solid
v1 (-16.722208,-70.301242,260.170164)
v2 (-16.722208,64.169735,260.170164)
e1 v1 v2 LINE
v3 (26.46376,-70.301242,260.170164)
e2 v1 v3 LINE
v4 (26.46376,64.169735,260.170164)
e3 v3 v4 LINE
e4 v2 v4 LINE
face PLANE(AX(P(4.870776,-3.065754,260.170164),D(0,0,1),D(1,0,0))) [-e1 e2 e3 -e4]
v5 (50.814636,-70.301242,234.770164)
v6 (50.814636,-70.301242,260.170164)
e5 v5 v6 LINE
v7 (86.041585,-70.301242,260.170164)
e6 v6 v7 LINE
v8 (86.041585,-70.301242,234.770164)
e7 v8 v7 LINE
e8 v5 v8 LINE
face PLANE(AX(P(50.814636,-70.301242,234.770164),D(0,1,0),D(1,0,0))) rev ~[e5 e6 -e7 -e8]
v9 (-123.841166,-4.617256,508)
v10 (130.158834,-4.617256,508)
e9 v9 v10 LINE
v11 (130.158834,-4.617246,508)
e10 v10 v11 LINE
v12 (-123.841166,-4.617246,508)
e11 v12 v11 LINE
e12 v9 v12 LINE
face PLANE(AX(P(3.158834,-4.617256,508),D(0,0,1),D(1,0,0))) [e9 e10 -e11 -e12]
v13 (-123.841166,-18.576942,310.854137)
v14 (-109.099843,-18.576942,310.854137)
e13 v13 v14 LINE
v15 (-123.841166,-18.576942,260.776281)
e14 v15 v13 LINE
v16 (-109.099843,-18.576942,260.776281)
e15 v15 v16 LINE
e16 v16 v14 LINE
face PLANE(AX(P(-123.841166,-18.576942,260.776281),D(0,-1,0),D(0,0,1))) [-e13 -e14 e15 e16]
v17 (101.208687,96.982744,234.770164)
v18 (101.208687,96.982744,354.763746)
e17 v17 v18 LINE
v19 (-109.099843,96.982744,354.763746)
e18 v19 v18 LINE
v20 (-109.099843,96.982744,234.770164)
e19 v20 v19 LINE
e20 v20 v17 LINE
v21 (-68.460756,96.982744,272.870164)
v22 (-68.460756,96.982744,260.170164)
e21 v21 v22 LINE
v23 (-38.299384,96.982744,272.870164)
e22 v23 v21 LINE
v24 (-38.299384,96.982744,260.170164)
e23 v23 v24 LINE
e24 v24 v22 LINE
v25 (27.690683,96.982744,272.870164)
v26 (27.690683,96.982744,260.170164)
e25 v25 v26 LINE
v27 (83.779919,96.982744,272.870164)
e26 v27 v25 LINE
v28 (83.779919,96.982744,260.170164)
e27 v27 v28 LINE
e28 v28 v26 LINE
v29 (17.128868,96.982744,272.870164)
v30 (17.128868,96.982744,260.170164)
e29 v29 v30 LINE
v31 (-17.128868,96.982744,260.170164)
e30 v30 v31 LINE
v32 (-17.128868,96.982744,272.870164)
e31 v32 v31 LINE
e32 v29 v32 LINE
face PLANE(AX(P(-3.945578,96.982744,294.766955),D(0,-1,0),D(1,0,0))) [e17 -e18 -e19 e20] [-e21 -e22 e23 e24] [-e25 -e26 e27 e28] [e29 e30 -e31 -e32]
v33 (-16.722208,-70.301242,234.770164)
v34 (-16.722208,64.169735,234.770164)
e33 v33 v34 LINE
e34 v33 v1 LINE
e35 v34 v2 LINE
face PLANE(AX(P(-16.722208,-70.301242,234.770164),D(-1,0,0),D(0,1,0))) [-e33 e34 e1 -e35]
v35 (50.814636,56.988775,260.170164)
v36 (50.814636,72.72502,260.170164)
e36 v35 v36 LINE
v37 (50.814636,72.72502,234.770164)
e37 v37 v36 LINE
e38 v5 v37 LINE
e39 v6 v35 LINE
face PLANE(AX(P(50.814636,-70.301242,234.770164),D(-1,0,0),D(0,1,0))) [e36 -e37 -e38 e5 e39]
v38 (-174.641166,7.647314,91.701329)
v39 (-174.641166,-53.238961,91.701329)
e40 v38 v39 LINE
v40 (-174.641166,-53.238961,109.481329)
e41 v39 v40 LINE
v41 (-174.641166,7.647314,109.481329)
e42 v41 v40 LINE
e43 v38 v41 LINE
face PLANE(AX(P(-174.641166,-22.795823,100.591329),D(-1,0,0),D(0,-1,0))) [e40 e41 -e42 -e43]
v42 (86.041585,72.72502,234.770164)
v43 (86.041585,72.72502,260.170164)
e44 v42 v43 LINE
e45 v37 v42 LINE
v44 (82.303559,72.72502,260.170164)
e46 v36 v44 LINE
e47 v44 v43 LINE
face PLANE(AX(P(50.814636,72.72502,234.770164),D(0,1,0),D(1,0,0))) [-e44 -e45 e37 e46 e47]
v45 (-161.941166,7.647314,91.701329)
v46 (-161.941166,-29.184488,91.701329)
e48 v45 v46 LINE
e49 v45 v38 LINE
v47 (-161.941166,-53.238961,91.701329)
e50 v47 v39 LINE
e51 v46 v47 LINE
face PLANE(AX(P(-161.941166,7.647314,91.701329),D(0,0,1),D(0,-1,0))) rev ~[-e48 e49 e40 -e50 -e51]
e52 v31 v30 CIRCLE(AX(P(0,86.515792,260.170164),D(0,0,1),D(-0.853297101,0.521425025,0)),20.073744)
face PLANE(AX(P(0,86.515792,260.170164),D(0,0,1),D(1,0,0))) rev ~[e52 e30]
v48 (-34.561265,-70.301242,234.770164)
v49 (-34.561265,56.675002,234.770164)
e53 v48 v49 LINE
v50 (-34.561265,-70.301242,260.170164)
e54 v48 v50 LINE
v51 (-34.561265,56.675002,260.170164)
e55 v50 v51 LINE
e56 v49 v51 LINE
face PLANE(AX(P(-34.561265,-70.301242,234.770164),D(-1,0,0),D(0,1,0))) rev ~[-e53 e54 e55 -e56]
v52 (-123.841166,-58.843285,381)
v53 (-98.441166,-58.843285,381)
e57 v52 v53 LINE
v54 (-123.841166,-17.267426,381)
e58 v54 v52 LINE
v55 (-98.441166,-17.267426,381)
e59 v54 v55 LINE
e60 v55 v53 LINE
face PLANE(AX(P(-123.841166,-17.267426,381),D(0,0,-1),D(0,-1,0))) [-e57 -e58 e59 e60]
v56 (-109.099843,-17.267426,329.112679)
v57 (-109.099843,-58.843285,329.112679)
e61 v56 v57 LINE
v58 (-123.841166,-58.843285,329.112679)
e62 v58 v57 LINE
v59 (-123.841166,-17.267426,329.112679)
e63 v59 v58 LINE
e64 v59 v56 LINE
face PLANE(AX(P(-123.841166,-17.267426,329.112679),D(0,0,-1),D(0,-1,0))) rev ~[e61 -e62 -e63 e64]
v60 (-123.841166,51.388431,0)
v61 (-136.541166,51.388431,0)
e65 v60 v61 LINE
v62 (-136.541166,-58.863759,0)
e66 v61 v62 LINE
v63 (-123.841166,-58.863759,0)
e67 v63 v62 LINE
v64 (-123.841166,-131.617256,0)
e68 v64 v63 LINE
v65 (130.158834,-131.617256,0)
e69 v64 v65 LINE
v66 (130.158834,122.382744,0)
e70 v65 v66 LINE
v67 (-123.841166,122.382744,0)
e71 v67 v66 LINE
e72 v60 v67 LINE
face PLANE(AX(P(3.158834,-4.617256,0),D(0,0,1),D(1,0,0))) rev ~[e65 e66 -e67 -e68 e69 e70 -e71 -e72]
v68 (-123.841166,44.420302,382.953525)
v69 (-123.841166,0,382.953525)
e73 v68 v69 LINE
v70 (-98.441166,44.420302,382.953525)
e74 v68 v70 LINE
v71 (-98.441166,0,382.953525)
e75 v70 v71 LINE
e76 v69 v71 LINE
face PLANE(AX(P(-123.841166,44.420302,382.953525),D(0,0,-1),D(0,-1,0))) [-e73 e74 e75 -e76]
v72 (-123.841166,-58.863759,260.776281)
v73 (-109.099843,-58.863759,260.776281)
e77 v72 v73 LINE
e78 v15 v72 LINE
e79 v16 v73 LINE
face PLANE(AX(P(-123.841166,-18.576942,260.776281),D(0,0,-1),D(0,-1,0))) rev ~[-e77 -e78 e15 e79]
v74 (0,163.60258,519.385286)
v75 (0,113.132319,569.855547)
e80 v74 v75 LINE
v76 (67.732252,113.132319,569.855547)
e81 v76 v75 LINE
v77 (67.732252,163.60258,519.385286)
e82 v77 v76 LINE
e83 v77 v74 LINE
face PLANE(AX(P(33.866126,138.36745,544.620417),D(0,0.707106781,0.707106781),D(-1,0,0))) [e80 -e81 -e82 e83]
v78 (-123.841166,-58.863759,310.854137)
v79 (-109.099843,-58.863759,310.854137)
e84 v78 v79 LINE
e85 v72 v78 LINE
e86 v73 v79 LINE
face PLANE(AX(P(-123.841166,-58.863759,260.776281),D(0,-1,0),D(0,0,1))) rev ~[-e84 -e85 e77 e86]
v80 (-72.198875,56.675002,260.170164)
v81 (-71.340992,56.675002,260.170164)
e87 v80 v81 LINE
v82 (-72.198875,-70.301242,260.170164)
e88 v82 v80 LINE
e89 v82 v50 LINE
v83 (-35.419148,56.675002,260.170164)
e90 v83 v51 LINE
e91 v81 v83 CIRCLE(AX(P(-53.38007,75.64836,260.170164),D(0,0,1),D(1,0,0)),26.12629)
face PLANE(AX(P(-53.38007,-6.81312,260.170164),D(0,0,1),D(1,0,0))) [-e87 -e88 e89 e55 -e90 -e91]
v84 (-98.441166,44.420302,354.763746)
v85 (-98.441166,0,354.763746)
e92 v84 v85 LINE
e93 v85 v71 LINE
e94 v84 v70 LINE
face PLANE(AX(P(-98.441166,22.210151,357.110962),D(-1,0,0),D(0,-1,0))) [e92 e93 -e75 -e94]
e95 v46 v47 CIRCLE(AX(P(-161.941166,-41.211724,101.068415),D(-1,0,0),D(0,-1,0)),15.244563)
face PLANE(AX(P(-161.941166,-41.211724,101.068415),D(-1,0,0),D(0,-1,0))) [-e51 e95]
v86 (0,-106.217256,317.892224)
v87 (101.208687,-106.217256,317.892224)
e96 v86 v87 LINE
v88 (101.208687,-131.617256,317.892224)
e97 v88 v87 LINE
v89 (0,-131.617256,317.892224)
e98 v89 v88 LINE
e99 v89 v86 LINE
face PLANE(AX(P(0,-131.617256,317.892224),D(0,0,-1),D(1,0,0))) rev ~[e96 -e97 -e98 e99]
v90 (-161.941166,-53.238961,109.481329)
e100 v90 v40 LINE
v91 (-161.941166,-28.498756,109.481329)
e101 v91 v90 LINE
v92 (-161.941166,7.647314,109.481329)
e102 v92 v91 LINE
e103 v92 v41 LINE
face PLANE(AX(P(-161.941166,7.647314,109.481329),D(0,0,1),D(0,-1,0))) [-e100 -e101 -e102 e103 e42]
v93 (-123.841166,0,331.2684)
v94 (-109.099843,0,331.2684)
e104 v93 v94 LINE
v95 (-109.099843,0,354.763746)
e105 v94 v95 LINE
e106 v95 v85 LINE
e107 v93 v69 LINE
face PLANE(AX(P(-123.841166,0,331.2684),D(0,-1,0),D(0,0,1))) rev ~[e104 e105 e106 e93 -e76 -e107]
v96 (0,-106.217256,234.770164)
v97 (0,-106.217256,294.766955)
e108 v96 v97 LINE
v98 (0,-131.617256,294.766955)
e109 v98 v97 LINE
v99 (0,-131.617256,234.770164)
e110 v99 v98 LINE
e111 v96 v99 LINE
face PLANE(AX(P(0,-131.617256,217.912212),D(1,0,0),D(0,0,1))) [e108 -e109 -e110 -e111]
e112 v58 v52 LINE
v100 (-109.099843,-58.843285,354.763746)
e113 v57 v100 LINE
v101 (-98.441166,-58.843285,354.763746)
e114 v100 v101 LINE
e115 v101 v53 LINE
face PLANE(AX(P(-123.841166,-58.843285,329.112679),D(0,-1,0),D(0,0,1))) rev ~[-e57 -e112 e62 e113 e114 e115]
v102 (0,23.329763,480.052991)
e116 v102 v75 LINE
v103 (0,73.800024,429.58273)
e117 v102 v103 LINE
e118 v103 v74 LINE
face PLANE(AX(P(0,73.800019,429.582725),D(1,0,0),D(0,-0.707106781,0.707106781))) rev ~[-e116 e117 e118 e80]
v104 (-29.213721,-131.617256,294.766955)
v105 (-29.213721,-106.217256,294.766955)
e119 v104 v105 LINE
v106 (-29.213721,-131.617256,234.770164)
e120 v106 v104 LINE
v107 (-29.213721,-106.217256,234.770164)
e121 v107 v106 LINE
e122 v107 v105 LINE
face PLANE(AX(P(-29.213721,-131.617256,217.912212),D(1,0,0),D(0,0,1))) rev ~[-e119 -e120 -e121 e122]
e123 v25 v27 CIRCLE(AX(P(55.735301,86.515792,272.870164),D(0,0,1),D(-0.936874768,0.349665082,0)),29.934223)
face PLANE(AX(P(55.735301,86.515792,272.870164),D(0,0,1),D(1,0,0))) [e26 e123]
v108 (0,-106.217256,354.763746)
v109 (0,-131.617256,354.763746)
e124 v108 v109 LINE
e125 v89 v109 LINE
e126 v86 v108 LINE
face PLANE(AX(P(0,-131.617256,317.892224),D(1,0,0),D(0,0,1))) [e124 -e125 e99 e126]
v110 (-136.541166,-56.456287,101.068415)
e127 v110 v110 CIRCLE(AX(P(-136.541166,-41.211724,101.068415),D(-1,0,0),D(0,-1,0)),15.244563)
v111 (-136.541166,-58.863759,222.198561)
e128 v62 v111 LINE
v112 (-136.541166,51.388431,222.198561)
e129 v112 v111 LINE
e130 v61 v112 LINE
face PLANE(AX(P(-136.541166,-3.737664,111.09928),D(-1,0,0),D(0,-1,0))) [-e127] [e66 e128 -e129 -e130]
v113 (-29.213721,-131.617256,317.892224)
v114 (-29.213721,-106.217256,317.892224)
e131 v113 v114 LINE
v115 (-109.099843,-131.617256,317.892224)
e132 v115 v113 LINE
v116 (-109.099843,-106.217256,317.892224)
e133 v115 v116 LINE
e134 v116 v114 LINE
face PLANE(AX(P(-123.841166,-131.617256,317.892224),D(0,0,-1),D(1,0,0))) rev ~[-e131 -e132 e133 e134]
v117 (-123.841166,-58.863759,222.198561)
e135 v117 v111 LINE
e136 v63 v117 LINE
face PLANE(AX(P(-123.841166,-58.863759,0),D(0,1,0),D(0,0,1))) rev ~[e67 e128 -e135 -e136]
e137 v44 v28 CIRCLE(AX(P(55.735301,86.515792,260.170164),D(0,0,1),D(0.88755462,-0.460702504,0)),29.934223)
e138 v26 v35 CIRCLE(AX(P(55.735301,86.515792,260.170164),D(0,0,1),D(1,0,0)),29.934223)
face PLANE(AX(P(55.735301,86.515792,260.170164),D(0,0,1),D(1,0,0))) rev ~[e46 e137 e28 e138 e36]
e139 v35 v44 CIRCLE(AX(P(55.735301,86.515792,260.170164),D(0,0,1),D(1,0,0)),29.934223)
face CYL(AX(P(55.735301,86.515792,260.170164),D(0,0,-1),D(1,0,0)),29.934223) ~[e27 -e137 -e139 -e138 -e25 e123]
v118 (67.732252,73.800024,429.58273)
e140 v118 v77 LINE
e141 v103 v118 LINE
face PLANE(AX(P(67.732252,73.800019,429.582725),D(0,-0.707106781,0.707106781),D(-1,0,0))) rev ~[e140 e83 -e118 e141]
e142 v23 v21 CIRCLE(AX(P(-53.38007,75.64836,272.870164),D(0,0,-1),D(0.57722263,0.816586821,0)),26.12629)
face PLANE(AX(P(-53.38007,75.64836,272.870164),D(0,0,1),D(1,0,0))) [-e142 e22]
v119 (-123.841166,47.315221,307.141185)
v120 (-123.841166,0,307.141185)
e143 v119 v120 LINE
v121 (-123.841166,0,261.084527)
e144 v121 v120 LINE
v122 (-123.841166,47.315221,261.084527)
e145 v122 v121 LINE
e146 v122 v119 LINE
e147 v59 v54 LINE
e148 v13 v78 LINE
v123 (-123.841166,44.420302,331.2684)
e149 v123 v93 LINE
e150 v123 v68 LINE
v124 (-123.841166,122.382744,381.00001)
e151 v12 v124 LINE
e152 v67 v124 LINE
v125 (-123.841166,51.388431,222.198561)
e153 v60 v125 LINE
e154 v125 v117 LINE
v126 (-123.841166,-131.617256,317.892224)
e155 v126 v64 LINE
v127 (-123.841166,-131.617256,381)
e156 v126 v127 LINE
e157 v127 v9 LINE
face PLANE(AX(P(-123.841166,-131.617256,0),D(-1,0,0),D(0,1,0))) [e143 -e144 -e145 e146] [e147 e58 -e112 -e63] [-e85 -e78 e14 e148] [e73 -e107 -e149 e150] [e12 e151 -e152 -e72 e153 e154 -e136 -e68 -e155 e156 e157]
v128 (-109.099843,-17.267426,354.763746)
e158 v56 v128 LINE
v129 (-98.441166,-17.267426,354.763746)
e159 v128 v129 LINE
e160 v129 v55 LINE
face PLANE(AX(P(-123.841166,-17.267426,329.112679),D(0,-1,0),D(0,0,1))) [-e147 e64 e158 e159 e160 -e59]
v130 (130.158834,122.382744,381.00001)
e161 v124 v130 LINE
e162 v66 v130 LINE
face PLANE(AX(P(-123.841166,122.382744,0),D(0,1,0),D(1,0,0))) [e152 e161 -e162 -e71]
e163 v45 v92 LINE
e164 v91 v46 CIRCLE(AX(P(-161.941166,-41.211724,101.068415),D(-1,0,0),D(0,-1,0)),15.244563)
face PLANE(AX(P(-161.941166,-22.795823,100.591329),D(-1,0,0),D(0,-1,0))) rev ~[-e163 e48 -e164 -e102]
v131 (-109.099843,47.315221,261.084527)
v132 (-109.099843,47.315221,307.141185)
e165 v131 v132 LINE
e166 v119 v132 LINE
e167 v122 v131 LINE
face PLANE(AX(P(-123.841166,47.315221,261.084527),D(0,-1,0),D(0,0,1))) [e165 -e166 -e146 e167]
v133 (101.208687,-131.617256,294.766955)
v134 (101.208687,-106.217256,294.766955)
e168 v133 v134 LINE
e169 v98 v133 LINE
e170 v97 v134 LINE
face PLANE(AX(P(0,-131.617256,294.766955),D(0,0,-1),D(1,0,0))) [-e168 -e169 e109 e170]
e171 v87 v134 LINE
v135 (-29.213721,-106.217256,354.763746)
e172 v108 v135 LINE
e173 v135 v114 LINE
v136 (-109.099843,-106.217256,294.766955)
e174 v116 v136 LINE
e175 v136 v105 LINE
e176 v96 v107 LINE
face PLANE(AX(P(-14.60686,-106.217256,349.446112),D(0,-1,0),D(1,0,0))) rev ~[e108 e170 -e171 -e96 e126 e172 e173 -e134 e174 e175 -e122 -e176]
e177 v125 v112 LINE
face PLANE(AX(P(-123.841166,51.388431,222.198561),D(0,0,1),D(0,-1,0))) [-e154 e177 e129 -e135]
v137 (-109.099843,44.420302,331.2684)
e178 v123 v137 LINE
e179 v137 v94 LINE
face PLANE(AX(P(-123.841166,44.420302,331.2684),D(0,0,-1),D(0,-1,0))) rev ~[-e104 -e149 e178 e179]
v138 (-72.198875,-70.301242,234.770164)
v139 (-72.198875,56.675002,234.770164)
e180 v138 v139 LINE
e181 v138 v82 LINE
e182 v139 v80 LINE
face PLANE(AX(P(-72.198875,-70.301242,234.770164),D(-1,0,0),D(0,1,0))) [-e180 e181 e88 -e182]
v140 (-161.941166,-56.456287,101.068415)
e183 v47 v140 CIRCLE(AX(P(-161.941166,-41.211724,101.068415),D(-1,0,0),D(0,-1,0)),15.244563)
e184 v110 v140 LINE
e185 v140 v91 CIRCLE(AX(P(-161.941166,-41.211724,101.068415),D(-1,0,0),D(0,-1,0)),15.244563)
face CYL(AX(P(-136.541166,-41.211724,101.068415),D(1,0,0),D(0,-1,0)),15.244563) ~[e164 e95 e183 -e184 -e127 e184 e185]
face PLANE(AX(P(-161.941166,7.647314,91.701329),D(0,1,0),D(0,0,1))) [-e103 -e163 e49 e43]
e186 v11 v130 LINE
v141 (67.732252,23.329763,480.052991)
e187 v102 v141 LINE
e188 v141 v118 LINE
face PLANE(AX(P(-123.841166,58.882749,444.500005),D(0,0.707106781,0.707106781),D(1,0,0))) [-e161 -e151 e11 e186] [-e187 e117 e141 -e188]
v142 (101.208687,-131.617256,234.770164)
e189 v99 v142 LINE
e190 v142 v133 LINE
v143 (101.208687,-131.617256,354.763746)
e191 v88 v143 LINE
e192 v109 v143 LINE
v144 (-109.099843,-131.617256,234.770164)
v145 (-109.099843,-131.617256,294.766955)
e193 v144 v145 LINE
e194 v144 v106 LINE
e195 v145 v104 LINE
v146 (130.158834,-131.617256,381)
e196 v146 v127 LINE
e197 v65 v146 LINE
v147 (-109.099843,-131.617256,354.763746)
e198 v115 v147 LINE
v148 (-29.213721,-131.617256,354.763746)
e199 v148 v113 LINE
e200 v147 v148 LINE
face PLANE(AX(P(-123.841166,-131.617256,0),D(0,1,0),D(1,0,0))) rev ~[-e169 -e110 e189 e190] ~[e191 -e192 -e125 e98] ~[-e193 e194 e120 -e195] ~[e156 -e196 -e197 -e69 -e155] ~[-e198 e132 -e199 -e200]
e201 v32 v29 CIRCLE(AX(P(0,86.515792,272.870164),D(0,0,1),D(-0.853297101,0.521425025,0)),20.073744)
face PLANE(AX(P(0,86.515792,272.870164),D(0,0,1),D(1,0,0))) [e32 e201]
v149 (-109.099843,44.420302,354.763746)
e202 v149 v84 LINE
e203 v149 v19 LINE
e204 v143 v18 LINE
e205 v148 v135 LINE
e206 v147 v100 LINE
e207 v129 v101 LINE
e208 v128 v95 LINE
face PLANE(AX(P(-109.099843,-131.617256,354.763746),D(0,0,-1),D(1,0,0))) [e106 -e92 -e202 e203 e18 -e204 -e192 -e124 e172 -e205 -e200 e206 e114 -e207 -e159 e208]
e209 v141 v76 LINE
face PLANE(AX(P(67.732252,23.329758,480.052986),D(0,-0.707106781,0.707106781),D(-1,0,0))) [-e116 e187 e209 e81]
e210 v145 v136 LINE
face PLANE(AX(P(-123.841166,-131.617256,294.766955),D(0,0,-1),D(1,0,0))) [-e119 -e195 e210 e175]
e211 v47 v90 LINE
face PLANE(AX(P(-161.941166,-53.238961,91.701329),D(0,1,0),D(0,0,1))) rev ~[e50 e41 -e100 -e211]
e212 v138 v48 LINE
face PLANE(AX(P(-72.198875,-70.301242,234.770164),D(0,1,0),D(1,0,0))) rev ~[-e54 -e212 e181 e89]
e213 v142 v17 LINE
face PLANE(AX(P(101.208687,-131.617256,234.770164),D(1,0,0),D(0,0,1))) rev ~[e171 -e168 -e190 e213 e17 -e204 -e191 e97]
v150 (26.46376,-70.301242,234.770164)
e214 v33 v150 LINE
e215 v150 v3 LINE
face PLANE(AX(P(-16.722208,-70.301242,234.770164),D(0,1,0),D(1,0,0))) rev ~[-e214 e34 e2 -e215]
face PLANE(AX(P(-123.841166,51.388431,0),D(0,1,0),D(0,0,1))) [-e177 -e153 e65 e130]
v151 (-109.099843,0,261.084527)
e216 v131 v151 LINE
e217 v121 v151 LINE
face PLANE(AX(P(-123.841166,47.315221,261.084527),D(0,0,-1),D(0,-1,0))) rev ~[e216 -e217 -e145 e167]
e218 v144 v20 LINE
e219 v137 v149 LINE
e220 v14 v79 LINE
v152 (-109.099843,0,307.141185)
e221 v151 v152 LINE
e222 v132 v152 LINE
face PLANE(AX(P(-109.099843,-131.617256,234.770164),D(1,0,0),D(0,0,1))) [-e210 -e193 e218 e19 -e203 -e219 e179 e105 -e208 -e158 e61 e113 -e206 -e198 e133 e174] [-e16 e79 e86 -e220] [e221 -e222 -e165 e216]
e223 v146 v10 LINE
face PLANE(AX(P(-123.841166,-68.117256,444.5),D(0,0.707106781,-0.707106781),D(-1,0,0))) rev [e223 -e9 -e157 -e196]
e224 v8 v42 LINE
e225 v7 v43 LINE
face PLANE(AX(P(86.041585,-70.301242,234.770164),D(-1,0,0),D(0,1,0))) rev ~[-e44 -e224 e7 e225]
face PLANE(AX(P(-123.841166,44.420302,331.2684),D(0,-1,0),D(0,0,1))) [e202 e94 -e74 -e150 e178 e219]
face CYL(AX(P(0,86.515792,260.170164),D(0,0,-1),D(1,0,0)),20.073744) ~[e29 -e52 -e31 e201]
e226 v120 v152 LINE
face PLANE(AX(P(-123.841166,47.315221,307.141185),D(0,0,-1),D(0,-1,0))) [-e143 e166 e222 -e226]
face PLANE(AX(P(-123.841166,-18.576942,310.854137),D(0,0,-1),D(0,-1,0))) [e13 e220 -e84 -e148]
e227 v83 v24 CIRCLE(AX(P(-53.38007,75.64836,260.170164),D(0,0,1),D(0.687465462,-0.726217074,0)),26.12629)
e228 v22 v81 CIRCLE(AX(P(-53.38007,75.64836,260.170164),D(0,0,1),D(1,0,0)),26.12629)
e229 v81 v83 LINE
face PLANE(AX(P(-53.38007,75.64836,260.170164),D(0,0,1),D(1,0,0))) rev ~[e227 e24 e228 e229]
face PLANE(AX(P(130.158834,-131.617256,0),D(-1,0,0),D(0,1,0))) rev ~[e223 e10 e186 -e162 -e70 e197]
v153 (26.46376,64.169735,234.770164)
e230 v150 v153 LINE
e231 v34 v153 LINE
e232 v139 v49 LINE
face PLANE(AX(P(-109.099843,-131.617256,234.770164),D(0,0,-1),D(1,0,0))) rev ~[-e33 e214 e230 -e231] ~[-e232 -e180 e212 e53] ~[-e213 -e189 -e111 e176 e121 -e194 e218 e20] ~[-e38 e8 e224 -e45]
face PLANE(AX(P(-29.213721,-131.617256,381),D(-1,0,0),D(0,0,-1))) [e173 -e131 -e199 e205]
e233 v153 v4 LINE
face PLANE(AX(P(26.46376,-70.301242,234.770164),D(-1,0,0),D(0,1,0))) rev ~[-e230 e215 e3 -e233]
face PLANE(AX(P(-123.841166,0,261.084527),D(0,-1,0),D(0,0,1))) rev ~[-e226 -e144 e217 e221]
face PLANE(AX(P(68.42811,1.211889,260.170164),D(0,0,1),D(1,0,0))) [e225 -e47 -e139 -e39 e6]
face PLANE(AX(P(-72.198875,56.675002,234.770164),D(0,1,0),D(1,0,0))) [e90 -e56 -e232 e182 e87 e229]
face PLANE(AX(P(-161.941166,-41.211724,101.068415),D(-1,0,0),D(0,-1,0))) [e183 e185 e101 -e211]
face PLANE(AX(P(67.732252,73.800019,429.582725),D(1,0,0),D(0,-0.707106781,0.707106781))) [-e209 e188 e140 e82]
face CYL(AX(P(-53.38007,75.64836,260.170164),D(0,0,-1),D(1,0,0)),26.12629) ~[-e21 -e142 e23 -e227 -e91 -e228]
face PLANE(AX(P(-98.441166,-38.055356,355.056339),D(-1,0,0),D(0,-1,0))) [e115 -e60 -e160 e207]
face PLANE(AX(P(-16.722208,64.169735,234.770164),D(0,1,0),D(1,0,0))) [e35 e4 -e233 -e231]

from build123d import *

# Parameters (mm, degrees)
F0_W      = 254
F0_H      = 254
F1_DEPTH  = 508
F2_SIZE   = 127
F3_SIZE   = 126.99999
F4_W      = 110.2521903813
F4_H      = 222.1985608339
F5_DEPTH  = 12.7
F6_R      = 15.2445630658
F7_DEPTH  = 25.4
F8_W      = 60.8862751365
F8_H      = 17.78
F9_DEPTH  = 12.7
F10_W     = 44.4203019142
F10_H     = 51.6851246357
F10_W_2   = 47.3152212799
F10_H_2   = 46.0566580296
F10_W_3   = 41.5758583695
F10_H_3   = 51.8873212337
F10_W_4   = 40.2868166566
F10_H_4   = 50.077855587
F11_DEPTH = 25.4
F12_W     = 67.7322521806
F12_H     = 71.3757276535
F13_DEPTH = 127
F14_W     = 210.3085294366
F14_H     = 119.9935823679
F15_DEPTH = 228.6
F16_W     = 37.6376099885
F16_H     = 126.9762441516
F16_W_2   = 43.185967952
F16_H_2   = 134.4709768891
F16_W_3   = 35.2269485593
F16_H_3   = 143.0262625217
F17_DEPTH = 25.4
F18_R     = 26.1262901257
F18_R_2   = 20.0737439282
F18_R_3   = 29.9342227193
F19_DEPTH = 12.7
F20_W     = 29.2137209326
F20_H     = 63.1077764034
F20_H_2   = 23.1252685189
F20_W_2   = 94.6274452358
F20_W_3   = 130.1588338315
F20_H_3   = 76.8547430634
F21_DEPTH = 25.4


# Not quite as in the source:
# - a fillet or chamfer is up to 0.001 mm smaller than in the source, because OpenCascade refuses the exact size


with BuildPart() as f1:
    # F0 (on Top) → F1 (new body)
    with BuildSketch(Plane.XY):
        with Locations((3.1588338315, -4.6172558538)):
            Rectangle(F0_W, F0_H)
    extrude(amount=F1_DEPTH)

    # F2
    f2_edges = [f1.edges().sort_by_distance(p)[0] for p in [
        (3.158834, -131.617256, 508),
    ]]
    chamfer(f2_edges, length=F2_SIZE)

    # F3 (size 127 in the source; OpenCascade refuses exactly that, so slightly less here)
    f3_edges = [f1.edges().sort_by_distance(p)[0] for p in [
        (3.158834, 122.382744, 508),
    ]]
    chamfer(f3_edges, length=F3_SIZE)

    # F4 (on face) → F5 (join)
    with BuildSketch(Plane(origin=(-123.8411661685, 0, 0), x_dir=(0, -1, 0), z_dir=(-1, 0, 0))):
        with Locations((3.7376638502, 111.099280417)):
            Rectangle(F4_W, F4_H)
    extrude(amount=F5_DEPTH)

    # F6 (on face) → F7 (join)
    with BuildSketch(Plane(origin=(-136.5411661685, 0, 0), x_dir=(0, -1, 0), z_dir=(-1, 0, 0))):
        with Locations((41.2117242813, 101.0684147477)):
            Circle(F6_R)
    extrude(amount=F7_DEPTH)

    # F8 (on face) → F9 (join)
    with BuildSketch(Plane(origin=(-161.9411661685, 0, 0), x_dir=(0, -1, 0), z_dir=(-1, 0, 0))):
        with Locations((22.795823104, 100.5913294025)):
            Rectangle(F8_W, F8_H)
    extrude(amount=F9_DEPTH)

    # F10 (on face) → F11 (cut)
    with BuildSketch(Plane(origin=(-123.8411661685, 0, 0), x_dir=(0, -1, 0), z_dir=(-1, 0, 0))):
        with Locations((-22.2101509571, 357.1109622717)):
            Rectangle(F10_W, F10_H)
        with Locations((-23.6576106399, 284.112855792)):
            Rectangle(F10_W_2, F10_H_2)
        with Locations((38.0553556606, 355.0563393831)):
            Rectangle(F10_W_3, F10_H_3)
        with Locations((38.7203507125, 285.8152091503)):
            Rectangle(F10_W_4, F10_H_4)
    extrude(amount=-F11_DEPTH, mode=Mode.SUBTRACT)

    # F12 (on face) → F13 (join)
    with BuildSketch(Plane(origin=(0, 251.6913720731, 251.6913720731), x_dir=(-1, 0, 0), z_dir=(0, 0.7071067812, 0.7071067812))):
        with Locations((-33.8661260903, 287.2642278671)):
            Rectangle(F12_W, F12_H)
    extrude(amount=F13_DEPTH)

    # F14 (on face) → F15 (cut)
    with BuildSketch(Plane.XZ.offset(131.6172558538)):
        with Locations((-3.9455778897, 294.7669550776)):
            Rectangle(F14_W, F14_H)
    extrude(amount=-F15_DEPTH, mode=Mode.SUBTRACT)

    # F16 (on face) → F17 (join)
    with BuildSketch(Plane.XY.offset(234.7701638937)):
        with Locations((-53.3800702542, -6.8131200969)):
            Rectangle(F16_W, F16_H)
        with Locations((4.870776087, -3.0657537282)):
            Rectangle(F16_W_2, F16_H_2)
        with Locations((68.4281103313, 1.2118890882)):
            Rectangle(F16_W_3, F16_H_3)
    extrude(amount=F17_DEPTH)

    # F18 (on face) → F19 (join)
    with BuildSketch(Plane.XY.offset(260.1701638937)):
        with Locations((-53.3800702542, 75.6483599544)):
            Circle(F18_R)
        with Locations((0, 86.5157917142)):
            Circle(F18_R_2)
        with Locations((55.7353012264, 86.5157917142)):
            Circle(F18_R_3)
    extrude(amount=F19_DEPTH)

    # F20 (on face) → F21 (join)
    with BuildSketch(Plane.XZ.offset(131.6172558538)):
        with Locations((-14.6068604663, 349.4461117983)):
            Rectangle(F20_W, F20_H)
        with Locations((-14.6068604663, 306.3295893371)):
            Rectangle(F20_W, F20_H_2)
        with Locations((-76.5274435505, 306.3295893371)):
            Rectangle(F20_W_2, F20_H_2)
        with Locations((65.0794169158, 306.3295893371)):
            Rectangle(F20_W_3, F20_H_2)
        with Locations((-14.6068604663, 256.3395835459)):
            Rectangle(F20_W, F20_H_3)
    extrude(amount=-F21_DEPTH)


solid = f1.part
